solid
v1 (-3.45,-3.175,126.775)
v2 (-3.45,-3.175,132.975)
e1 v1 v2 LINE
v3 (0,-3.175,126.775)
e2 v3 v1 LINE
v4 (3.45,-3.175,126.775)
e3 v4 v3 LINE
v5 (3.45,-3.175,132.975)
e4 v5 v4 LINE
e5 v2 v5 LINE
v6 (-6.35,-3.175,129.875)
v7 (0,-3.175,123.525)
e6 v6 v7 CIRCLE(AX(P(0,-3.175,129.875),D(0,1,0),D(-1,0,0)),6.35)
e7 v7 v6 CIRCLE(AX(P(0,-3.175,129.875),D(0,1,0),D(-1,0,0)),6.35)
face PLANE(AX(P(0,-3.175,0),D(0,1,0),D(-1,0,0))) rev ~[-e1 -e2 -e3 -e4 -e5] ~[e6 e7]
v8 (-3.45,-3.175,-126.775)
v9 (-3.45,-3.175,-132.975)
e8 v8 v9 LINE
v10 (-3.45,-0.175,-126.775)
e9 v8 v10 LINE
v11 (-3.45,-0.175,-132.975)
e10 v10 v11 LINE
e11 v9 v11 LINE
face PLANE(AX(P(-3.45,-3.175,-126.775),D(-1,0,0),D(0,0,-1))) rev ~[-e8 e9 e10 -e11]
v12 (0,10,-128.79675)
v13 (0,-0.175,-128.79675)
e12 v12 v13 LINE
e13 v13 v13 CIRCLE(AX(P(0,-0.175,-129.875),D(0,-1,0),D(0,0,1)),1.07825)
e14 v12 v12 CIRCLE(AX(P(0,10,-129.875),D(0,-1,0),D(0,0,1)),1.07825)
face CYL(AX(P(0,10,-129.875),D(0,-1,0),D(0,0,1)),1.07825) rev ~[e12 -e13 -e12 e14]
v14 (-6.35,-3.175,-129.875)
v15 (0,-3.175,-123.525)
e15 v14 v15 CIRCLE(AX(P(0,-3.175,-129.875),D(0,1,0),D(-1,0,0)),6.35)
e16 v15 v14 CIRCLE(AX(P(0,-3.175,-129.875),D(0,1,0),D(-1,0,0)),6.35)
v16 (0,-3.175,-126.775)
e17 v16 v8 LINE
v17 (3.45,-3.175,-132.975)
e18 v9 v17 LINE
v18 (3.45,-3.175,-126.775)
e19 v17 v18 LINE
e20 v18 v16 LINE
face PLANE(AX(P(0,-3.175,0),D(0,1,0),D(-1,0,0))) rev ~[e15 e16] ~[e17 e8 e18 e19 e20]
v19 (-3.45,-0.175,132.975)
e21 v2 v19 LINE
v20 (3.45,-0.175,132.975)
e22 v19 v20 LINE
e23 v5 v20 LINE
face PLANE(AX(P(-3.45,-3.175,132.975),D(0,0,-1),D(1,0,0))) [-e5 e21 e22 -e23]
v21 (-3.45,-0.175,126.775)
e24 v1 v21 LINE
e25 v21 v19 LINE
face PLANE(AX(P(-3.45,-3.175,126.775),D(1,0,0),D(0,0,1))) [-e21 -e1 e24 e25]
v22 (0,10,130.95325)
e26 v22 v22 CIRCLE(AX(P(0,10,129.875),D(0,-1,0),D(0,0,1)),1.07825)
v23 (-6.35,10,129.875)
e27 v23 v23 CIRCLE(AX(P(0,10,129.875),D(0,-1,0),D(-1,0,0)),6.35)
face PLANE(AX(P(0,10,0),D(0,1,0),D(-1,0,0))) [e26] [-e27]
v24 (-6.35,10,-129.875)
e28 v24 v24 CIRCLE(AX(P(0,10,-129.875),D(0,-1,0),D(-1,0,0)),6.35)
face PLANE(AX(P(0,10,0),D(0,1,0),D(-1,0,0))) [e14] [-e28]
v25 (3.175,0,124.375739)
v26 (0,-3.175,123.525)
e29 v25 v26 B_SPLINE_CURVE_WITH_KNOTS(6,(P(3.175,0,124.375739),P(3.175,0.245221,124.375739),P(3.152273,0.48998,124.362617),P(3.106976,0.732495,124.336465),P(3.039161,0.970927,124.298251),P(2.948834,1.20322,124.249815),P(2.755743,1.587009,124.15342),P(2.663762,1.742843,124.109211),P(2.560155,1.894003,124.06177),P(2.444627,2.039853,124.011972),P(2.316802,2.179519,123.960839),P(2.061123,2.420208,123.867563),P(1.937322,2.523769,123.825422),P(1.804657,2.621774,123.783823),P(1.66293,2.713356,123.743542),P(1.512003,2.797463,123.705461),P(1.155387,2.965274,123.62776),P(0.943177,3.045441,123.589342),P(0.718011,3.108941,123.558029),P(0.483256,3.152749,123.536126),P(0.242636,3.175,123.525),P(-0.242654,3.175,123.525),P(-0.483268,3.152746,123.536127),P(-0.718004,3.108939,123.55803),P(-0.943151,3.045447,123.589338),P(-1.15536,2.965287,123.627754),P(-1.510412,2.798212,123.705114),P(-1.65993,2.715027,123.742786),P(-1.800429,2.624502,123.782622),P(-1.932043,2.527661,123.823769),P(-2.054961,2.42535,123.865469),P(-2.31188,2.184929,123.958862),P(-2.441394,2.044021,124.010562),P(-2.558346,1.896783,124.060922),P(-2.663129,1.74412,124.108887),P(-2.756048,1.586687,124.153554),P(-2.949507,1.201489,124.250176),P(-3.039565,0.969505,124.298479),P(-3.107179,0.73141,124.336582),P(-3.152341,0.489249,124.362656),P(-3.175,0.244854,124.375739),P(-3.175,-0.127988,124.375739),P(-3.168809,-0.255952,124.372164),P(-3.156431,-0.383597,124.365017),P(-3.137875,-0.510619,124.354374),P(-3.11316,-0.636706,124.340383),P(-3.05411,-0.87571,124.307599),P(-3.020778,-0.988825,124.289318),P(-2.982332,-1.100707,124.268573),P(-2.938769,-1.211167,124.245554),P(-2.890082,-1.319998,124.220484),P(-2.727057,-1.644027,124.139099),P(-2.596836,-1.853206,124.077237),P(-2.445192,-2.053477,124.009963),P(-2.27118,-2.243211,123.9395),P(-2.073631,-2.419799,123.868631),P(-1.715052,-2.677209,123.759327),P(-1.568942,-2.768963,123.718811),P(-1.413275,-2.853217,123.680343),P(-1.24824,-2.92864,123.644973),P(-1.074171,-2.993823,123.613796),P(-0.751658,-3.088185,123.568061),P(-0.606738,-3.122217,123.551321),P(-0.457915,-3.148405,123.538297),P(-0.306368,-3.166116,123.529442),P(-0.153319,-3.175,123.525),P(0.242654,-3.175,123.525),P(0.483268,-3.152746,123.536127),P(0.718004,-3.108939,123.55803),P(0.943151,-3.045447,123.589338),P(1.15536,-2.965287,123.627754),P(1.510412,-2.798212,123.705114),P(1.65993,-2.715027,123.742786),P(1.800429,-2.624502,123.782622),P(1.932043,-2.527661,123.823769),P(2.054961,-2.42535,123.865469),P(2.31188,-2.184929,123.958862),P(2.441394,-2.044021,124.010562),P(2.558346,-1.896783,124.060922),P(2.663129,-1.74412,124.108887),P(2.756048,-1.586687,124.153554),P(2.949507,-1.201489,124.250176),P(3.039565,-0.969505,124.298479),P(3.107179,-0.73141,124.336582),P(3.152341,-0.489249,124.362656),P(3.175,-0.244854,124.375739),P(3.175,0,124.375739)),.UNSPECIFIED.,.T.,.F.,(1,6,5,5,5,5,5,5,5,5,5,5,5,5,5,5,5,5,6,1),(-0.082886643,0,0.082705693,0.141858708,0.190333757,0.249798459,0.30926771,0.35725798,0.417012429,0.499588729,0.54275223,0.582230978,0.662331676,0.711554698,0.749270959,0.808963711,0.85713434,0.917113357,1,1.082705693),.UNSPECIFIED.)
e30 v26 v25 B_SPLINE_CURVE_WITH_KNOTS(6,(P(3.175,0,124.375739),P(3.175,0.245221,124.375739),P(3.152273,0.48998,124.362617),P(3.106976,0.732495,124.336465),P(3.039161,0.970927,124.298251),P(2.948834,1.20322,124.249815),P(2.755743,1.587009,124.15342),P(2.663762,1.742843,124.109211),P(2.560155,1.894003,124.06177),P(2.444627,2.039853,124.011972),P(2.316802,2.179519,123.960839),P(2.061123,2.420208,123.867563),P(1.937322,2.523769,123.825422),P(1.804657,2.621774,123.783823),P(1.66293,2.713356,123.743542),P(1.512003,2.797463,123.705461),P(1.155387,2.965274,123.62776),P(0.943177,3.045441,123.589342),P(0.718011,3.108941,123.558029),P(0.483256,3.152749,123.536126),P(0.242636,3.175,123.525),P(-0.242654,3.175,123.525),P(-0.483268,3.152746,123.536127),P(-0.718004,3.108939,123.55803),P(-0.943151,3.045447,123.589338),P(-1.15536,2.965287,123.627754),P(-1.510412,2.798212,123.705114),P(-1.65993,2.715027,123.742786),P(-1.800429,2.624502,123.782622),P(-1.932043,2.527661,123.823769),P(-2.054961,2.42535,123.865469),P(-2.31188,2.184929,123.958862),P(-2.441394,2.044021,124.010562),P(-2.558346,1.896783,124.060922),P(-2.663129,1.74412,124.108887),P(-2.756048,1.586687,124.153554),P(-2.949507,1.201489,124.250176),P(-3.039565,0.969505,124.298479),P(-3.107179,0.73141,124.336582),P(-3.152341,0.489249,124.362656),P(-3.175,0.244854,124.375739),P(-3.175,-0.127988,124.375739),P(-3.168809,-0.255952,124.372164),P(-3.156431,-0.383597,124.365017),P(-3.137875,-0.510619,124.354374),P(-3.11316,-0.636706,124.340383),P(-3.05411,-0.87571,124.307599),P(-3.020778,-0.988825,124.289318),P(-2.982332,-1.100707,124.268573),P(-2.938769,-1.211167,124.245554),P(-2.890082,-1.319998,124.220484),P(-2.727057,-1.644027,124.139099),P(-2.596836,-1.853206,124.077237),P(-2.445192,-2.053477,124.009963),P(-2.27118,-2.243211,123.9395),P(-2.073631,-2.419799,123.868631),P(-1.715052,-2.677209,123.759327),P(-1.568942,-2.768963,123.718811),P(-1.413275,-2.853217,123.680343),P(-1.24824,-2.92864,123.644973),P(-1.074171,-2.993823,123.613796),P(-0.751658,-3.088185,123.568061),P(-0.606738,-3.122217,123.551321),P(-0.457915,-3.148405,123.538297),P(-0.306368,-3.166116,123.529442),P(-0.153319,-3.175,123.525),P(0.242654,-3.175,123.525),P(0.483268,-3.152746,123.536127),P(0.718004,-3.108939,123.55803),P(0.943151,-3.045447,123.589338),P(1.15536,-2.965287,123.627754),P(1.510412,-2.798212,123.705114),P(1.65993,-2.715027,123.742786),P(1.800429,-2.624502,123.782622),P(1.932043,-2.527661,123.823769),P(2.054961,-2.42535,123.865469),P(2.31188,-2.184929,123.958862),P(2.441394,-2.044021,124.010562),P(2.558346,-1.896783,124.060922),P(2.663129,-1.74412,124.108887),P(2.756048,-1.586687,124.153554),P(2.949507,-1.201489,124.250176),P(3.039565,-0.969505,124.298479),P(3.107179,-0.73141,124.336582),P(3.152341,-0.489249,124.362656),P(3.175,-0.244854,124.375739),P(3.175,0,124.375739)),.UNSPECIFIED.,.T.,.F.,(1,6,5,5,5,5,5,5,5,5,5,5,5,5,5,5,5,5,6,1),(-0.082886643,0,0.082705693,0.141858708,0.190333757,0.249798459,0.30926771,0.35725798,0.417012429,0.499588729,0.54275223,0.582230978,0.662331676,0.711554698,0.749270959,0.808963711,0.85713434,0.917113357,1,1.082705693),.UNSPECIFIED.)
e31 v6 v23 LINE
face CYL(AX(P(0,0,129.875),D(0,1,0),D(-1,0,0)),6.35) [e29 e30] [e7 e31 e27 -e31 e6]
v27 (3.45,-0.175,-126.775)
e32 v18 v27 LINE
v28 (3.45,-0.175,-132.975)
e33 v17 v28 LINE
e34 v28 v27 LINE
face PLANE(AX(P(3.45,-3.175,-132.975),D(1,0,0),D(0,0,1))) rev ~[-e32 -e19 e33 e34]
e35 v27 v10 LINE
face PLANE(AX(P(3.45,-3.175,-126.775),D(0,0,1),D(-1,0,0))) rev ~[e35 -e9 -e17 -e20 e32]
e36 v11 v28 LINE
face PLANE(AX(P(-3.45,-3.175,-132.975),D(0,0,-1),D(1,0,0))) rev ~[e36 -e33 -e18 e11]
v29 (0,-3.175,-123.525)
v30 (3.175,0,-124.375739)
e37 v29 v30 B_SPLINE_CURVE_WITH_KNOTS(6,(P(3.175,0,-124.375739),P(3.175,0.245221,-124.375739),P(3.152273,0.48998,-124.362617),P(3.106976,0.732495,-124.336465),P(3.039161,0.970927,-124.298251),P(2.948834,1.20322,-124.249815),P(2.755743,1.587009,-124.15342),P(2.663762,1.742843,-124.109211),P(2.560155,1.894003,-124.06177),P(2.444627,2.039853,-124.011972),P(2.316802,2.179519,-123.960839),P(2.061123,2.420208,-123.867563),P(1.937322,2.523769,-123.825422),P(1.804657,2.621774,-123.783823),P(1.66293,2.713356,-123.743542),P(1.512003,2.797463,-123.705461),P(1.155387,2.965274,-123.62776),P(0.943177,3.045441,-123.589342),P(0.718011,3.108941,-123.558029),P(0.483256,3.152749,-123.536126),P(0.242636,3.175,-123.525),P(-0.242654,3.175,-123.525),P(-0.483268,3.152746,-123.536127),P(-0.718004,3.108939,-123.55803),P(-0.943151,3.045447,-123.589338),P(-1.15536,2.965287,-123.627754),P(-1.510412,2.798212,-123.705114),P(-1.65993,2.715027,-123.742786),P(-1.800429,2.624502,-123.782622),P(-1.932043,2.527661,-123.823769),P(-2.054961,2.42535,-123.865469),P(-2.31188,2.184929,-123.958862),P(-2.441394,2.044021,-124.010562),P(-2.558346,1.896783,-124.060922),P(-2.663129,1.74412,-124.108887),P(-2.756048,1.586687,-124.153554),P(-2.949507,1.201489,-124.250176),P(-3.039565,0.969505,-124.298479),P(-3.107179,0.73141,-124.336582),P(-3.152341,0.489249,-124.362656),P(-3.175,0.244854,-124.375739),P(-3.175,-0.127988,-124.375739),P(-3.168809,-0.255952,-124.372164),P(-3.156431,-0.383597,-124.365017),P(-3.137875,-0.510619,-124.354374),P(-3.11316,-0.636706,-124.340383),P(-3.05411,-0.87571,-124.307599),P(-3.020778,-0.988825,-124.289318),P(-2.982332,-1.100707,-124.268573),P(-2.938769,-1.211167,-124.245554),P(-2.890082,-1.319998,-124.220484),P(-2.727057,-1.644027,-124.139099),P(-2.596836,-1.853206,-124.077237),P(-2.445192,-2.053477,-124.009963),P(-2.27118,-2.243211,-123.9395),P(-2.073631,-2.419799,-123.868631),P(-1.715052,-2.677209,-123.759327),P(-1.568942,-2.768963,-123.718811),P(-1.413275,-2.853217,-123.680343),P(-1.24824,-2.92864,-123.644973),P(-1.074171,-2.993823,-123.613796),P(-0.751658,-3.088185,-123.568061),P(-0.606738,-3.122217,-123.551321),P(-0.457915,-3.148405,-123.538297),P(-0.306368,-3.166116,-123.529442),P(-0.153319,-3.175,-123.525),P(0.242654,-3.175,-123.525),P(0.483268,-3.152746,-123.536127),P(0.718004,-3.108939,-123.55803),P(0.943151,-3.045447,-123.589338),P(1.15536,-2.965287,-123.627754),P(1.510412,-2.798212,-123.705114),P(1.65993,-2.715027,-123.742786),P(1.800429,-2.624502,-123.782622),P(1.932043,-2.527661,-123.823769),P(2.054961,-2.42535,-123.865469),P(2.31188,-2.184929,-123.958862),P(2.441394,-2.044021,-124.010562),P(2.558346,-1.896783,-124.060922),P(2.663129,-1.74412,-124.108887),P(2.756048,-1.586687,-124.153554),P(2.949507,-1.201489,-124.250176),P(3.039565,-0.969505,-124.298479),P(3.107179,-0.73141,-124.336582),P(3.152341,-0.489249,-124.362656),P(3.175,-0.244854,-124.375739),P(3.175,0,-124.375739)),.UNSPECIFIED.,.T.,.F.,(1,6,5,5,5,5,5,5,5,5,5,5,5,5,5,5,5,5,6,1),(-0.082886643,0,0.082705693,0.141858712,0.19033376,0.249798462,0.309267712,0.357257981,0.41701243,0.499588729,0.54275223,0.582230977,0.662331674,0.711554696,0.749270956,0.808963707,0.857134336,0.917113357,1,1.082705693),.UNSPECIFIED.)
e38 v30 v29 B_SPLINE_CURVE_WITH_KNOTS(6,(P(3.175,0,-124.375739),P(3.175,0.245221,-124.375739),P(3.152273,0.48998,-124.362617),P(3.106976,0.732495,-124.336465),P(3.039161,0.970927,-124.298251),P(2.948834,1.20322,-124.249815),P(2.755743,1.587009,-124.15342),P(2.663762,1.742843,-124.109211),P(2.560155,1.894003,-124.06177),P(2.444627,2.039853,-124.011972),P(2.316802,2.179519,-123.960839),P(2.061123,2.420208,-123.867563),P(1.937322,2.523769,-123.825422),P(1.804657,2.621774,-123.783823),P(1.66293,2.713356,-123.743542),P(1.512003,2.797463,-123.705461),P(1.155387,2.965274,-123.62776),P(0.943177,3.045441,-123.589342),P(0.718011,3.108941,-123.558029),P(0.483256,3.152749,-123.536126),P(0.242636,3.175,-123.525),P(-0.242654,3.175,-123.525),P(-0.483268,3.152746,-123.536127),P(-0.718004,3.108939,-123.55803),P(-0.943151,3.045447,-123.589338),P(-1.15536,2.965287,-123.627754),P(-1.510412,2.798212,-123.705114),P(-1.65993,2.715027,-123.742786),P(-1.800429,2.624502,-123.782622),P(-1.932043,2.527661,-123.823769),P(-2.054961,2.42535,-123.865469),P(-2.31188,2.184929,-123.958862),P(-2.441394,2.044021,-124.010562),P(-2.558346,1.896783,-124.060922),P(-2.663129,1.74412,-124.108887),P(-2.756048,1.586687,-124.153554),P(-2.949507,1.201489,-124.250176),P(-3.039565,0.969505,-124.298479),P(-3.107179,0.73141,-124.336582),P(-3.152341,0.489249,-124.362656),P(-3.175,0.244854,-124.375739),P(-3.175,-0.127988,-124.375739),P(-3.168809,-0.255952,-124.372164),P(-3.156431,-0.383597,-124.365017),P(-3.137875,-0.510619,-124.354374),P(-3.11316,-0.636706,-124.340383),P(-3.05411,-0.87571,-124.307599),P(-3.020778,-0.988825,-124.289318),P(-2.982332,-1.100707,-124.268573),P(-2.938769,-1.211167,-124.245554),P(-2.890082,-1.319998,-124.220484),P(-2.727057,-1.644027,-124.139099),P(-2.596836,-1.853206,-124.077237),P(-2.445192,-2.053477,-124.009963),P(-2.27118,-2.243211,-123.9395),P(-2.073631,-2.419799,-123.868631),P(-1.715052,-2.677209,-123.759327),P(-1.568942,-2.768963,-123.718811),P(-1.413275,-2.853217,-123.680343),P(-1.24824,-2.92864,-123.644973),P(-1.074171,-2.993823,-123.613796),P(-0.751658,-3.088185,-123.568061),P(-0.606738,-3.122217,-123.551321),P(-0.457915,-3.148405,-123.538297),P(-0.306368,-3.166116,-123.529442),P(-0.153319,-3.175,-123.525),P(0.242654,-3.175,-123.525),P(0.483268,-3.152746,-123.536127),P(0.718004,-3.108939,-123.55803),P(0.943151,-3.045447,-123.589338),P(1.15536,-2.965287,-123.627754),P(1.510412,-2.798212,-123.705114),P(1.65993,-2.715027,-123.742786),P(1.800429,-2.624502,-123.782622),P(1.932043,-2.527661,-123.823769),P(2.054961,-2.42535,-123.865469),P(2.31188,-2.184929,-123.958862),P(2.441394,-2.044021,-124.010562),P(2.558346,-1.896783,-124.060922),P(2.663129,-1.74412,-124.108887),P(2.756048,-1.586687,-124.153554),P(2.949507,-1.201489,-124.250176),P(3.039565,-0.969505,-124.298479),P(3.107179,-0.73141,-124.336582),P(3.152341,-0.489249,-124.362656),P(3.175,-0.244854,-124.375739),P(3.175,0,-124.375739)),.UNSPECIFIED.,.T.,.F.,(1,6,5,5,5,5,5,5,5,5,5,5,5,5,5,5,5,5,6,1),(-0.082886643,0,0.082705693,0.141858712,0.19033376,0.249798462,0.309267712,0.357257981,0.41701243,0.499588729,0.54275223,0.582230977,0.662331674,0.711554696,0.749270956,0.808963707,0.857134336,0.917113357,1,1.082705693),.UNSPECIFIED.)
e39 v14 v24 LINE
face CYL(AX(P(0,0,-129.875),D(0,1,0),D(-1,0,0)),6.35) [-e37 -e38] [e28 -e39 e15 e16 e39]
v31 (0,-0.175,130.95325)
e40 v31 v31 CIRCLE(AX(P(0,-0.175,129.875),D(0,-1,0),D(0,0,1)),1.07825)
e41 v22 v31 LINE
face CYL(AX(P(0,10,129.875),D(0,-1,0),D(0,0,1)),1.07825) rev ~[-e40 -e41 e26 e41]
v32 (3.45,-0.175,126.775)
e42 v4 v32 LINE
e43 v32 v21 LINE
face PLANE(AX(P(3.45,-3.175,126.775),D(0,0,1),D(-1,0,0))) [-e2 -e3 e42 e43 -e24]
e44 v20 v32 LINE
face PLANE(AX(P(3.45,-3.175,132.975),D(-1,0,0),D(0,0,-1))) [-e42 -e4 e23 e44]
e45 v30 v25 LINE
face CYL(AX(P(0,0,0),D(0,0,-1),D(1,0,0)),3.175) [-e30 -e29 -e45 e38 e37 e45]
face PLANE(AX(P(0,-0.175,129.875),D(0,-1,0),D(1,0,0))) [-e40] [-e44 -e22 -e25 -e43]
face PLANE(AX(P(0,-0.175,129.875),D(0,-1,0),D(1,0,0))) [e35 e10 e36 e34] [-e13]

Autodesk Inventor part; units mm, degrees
ref_plane "YZ Plane" through (0, 0, 0) normal (1, 0, 0) x (0, 1, 0)
ref_plane "XZ Plane" through (0, 0, 0) normal (0, 1, 0) x (-1, 0, 0)
ref_plane "XY Plane" through (0, 0, 0) normal (0, 0, 1) x (1, 0, 0)
sketch "Sketch1" plane through (0, 0, 0) normal (0, 0, 1) x (1, 0, 0)
  circle A0 centre (0, 0) radius 3.175
  dimension "d0" = 6.35
extrude "Extrusion1" add sketch "Sketch1" along normal mid plane 259
sketch "Sketch2" plane through (0, 0, 0) normal (0, 1, 0) x (-1, 0, 0)
  circle A0 centre (0, 129.875) radius 6.35
  circle A1 centre (0, -129.875) radius 6.35
  line L0 (-3.175, -129.5) -> (-3.175, 129.5) projected
  line L1 (-3.175, 0) -> (16.7407, 0)
  point P0 (3.175, -105.625)
  dimension "d4" = 259.75
  dimension "d5" = 129.875
  dimension "d6" = 12.7
  dimension "d7" = 12.7
extrude "Extrusion2" add sketch "Sketch2" along normal blind 10 and the other way blind 3.175
sketch "Sketch3" plane through (0, 10, 129.875) normal (0, 1, 0) x (1, 0, 0)
  circle A0 centre (0, 0) radius 6.35 projected
  circle A1 centre (0, 259.75) radius 6.35 projected
  point P0 (0, 129.875)
hole "Hole1" at (0, 10, 129.875) at (0, 10, -129.875) direction (0, -1, 0) diameter 2.1565 end through all thread size "4-40 UNC" class "2B" standard "ANSI Unified Screw Threads"
sketch "Sketch9" plane through (0, -3.175, 129.875) normal (0, -1, 0) x (1, 0, 0)
  line L0 (-3.45, 3.1) -> (3.45, 3.1)
  line L1 (3.45, 3.1) -> (3.45, -3.1)
  line L2 (3.45, -3.1) -> (-3.45, -3.1)
  line L3 (-3.45, -3.1) -> (-3.45, 3.1)
  line L4 (-3.45, 3.1) -> (3.45, -3.1) construction
  line L5 (3.45, 3.1) -> (-3.45, -3.1) construction
  line L6 (0, -129.875) -> (-12.946, -129.875)
  line L7 (-3.45, -262.85) -> (3.45, -262.85)
  line L8 (3.45, -262.85) -> (3.45, -256.65)
  line L9 (3.45, -256.65) -> (-3.45, -256.65)
  line L10 (-3.45, -256.65) -> (-3.45, -262.85)
  point P0 (0, 0)
  dimension "d28" = 6.9
  dimension "d29" = 6.2
extrude "Extrusion6" cut sketch "Sketch9" against normal blind 3
properties part number "Solar_Panel_Bar"
